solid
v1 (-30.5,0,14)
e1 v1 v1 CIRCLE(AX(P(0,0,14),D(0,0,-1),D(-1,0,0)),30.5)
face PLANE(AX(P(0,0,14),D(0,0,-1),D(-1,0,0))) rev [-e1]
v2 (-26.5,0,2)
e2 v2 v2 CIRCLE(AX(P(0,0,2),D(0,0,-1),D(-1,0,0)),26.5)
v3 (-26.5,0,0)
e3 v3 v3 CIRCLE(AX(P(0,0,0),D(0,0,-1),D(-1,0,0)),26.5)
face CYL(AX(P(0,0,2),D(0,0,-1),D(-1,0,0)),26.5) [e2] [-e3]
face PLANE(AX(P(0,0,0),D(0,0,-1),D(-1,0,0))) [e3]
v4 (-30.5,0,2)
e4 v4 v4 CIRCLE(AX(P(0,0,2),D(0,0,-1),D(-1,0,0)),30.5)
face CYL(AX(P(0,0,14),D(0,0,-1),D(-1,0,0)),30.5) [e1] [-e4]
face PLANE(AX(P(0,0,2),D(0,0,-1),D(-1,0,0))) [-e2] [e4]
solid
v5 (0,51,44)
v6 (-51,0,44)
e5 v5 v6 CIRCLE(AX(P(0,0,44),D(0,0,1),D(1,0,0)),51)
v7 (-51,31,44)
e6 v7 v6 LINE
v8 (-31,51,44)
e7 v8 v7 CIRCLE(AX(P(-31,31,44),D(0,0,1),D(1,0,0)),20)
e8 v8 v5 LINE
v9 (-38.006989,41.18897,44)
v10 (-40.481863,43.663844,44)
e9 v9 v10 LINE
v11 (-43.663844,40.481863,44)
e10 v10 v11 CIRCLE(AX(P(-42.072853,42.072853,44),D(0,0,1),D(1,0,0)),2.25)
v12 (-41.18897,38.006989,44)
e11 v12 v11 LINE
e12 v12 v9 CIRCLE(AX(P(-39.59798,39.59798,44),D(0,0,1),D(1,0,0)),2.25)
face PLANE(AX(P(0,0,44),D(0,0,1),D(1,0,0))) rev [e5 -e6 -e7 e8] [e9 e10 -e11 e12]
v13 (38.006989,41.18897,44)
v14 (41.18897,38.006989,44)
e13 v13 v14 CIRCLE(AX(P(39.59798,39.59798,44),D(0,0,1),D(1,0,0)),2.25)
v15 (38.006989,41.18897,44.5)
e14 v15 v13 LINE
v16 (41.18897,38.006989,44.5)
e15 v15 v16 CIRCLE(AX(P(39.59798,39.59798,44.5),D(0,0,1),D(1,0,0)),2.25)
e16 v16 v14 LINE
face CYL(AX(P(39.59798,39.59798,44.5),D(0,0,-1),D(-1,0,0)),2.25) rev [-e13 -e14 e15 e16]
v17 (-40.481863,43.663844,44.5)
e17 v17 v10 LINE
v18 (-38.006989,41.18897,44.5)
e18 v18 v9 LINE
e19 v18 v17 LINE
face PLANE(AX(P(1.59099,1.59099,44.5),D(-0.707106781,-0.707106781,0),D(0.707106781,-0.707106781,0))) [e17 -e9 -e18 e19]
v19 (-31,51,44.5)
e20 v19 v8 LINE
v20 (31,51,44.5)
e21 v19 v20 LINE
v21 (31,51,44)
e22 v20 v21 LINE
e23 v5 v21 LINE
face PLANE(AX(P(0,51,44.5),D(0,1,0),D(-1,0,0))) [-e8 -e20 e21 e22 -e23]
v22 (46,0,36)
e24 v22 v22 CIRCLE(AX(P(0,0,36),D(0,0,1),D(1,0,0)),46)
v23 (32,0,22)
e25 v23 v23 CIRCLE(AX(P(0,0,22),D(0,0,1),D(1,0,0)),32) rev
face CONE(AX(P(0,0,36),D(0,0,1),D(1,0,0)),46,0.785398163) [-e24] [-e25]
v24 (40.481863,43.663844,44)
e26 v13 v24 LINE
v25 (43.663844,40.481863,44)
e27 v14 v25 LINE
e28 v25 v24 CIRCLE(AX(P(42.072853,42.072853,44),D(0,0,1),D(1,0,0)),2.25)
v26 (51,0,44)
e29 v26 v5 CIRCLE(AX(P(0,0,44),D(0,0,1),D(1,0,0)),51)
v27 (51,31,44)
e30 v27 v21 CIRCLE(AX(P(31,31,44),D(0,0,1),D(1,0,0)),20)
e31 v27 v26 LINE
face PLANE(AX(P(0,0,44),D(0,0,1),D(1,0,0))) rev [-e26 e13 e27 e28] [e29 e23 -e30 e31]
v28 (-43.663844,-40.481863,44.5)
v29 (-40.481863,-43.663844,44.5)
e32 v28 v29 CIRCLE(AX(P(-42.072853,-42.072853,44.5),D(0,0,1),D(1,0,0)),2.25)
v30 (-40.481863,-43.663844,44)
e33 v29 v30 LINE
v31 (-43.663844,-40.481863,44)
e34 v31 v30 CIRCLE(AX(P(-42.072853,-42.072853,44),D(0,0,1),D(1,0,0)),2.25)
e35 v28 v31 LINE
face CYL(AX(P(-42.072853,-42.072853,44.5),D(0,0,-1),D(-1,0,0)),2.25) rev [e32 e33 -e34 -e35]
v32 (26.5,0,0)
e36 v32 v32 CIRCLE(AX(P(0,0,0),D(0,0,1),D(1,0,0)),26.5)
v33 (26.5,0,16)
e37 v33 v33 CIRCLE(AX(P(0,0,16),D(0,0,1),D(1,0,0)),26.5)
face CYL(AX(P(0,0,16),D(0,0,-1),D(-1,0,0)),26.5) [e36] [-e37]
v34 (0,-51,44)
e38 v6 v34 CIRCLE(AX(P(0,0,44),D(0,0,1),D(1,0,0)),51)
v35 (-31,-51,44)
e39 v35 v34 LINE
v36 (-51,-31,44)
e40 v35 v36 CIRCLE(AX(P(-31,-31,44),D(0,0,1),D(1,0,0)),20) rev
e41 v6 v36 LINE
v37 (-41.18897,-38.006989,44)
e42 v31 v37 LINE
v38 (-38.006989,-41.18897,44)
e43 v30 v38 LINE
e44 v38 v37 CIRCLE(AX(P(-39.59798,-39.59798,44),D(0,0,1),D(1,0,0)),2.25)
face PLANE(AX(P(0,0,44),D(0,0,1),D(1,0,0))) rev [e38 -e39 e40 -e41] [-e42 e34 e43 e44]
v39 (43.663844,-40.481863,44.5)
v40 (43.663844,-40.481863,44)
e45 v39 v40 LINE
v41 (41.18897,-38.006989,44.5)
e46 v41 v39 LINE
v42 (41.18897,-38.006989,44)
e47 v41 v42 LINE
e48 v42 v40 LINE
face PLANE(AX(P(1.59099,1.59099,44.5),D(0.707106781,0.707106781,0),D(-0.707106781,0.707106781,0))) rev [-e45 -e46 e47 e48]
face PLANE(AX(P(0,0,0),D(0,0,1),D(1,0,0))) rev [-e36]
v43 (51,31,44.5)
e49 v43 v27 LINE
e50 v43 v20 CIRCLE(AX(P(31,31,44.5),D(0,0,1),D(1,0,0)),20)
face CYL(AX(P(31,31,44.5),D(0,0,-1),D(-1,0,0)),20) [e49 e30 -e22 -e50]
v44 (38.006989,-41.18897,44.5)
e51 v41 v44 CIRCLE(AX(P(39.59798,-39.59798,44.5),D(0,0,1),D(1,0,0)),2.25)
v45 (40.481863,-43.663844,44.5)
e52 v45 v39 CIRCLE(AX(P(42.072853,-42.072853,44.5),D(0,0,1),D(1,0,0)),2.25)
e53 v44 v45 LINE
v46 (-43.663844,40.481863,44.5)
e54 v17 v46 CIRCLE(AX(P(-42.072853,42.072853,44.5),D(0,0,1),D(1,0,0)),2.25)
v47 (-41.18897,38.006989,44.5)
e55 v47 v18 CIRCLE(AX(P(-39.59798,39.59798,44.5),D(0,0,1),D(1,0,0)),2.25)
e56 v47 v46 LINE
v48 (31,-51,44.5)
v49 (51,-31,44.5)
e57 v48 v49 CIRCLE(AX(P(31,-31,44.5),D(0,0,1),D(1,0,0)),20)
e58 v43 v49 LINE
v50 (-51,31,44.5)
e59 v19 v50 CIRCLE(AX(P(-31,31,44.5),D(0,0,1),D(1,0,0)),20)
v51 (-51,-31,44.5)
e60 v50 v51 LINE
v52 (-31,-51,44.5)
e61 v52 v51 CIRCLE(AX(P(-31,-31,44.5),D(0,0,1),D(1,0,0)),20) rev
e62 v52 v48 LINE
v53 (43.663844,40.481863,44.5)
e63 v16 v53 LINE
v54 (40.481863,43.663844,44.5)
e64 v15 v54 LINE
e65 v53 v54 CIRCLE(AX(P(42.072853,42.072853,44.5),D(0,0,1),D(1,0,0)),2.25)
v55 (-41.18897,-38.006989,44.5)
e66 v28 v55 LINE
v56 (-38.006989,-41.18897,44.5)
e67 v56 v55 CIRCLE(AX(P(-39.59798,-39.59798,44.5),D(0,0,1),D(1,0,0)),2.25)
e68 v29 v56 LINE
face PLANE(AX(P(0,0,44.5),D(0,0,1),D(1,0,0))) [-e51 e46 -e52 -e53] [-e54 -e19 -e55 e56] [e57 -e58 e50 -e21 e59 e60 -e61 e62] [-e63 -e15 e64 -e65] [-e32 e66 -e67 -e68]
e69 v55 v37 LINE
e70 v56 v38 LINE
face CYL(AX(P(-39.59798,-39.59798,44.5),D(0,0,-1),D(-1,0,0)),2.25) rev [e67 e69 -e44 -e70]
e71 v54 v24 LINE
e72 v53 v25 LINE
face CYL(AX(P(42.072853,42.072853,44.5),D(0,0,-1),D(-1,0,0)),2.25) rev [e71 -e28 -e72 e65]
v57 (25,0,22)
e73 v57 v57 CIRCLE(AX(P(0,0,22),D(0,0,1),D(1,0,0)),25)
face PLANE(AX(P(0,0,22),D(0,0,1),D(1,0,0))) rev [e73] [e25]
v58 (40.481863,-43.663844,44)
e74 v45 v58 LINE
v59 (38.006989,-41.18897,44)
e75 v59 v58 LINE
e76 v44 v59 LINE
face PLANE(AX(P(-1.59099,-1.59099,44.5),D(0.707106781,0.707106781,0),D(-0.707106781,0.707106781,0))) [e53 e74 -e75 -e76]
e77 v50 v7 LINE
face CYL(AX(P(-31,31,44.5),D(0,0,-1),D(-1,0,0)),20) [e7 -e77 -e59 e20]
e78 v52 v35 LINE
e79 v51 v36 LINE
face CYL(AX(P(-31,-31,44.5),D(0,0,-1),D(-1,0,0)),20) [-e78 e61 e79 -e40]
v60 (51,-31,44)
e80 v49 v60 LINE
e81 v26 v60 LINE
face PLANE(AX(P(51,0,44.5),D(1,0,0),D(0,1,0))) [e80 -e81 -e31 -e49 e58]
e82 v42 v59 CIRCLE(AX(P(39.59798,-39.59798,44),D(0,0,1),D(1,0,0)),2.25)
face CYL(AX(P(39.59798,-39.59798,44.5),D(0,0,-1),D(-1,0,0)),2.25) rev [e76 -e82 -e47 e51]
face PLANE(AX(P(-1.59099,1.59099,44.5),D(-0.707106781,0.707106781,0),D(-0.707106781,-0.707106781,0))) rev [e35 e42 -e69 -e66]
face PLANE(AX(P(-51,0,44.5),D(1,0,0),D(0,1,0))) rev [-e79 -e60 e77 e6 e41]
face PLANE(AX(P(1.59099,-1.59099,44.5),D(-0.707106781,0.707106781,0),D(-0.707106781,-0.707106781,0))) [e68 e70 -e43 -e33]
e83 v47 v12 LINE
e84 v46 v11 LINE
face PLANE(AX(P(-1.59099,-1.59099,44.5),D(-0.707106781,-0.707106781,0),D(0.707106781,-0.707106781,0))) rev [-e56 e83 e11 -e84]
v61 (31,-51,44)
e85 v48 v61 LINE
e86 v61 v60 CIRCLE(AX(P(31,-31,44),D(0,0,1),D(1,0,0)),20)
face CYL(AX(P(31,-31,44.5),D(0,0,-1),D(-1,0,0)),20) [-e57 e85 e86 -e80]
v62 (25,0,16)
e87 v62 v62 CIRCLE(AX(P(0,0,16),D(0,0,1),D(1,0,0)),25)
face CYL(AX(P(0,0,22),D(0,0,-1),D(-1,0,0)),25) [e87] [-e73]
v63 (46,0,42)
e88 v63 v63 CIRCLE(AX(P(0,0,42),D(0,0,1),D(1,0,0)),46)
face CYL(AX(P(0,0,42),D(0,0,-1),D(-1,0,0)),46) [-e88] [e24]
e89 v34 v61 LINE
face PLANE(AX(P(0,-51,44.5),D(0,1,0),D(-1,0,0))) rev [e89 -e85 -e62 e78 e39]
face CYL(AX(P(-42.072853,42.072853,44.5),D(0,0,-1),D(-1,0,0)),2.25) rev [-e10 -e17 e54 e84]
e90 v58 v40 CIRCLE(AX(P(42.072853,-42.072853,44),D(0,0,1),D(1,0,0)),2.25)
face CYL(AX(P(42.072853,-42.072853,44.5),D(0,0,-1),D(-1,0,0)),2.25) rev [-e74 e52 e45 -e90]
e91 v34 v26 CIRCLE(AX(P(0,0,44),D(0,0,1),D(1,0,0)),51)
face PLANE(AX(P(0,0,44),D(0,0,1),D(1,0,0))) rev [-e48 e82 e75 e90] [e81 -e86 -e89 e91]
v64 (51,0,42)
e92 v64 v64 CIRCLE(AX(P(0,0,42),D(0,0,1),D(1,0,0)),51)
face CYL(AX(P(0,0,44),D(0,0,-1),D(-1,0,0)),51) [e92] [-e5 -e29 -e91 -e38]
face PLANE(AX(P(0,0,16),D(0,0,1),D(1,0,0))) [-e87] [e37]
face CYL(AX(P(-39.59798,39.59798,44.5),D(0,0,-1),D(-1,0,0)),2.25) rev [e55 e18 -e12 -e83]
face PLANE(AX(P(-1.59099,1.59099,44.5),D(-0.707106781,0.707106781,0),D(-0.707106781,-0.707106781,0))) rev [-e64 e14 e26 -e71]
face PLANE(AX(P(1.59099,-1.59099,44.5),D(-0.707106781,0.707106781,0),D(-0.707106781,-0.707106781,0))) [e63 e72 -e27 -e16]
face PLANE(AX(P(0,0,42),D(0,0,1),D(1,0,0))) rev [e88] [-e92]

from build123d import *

# Parameters (mm, degrees)
ESQUISSE1_R             = 26.5
BOSS_EXTRU_1_DEPTH      = 16
ESQUISSE4_R             = 25
BOSS_EXTRU_2_DEPTH      = 6
ESQUISSE5_R             = 46
BOSS_EXTRU_3_DEPTH      = 14
CHANFREIN1_SIZE         = 14
ESQUISSE6_R             = 46
BOSS_EXTRU_4_DEPTH      = 6
ESQUISSE7_R             = 51
BOSS_EXTRU_5_DEPTH      = 2
BOSS_EXTRU_6_DEPTH      = 0.5
ESQUISSE9_R             = 30.5
BOSS_EXTRU_7_DEPTH      = 14
ESQUISSE10_R            = 30.5
ESQUISSE10_R_2          = 26.5
ENL_V_MAT_EXTRU_1_DEPTH = 2


with BuildPart() as part:
    # Esquisse1 → Boss.-Extru.1 (new body)
    with BuildSketch(Plane.XY):
        Circle(ESQUISSE1_R)
    extrude(amount=BOSS_EXTRU_1_DEPTH)

    # Esquisse4 → Boss.-Extru.2 (add)
    with BuildSketch(Plane.XY.offset(16)):
        Circle(ESQUISSE4_R)
    extrude(amount=BOSS_EXTRU_2_DEPTH)

    # Esquisse5 → Boss.-Extru.3 (add)
    with BuildSketch(Plane.XY.offset(22)):
        Circle(ESQUISSE5_R)
    extrude(amount=BOSS_EXTRU_3_DEPTH)

    # Chanfrein1
    chanfrein1_edges = [part.edges().sort_by_distance(p)[0] for p in [
        (-46, 0, 22),
    ]]
    chamfer(chanfrein1_edges, length=CHANFREIN1_SIZE - 0.0001)  # a hair under: the kernel refuses the full size

    # Esquisse6 → Boss.-Extru.4 (add)
    with BuildSketch(Plane.XY.offset(36)):
        Circle(ESQUISSE6_R)
    extrude(amount=BOSS_EXTRU_4_DEPTH)

    # Esquisse7 → Boss.-Extru.5 (add)
    with BuildSketch(Plane.XY.offset(42)):
        Circle(ESQUISSE7_R)
    extrude(amount=BOSS_EXTRU_5_DEPTH)

    # Esquisse8 → Boss.-Extru.6 (add)
    with BuildSketch(Plane.XY.offset(44)):
        with BuildLine():
            ThreePointArc((-51, -31), (-49.47759065, -38.653668647), (-45.142135624, -45.142135624))
            Line((-45.142135624, -45.142135624), (-43.663843738, -43.663843738))
            ThreePointArc((-43.663843738, -43.663843738), (-44.322853481, -42.072853481), (-43.663843738, -40.481863223))
            Line((-43.663843738, -40.481863223), (-41.188970004, -38.006989489))
            ThreePointArc((-41.188970004, -38.006989489), (-39.597979746, -37.347979746), (-38.006989489, -38.006989489))
            Line((-38.006989489, -38.006989489), (-36.062445841, -36.062445841))
            ThreePointArc((-36.062445841, -36.062445841), (-47.117856123, -19.516855134), (-51, -1.81e-07))
            Line((-51, -1.81e-07), (-51, -31))
        make_face()
        with BuildLine():
            Line((-43.663843738, -43.663843738), (-45.142135624, -45.142135624))
            ThreePointArc((-45.142135624, -45.142135624), (-38.653668647, -49.47759065), (-31, -51))
            Line((-31, -51), (6e-08, -51))
            ThreePointArc((6e-08, -51), (-19.516855023, -47.11785617), (-36.062445841, -36.062445841))
            Line((-36.062445841, -36.062445841), (-38.006989489, -38.006989489))
            ThreePointArc((-38.006989489, -38.006989489), (-37.347979746, -39.597979746), (-38.006989489, -41.188970004))
            Line((-38.006989489, -41.188970004), (-40.481863223, -43.663843738))
            ThreePointArc((-40.481863223, -43.663843738), (-42.072853481, -44.322853481), (-43.663843738, -43.663843738))
        make_face()
        with BuildLine():
            ThreePointArc((-36.062445841, -36.062445841), (-19.516855023, -47.11785617), (6e-08, -51))
            ThreePointArc((6e-08, -51), (19.516855078, -47.117856147), (36.062445841, -36.062445841))
            Line((36.062445841, -36.062445841), (0, 0))
            Line((0, 0), (-36.062445841, -36.062445841))
        make_face()
        with BuildLine():
            ThreePointArc((-36.062445841, 36.062445841), (-47.117856193, 19.516854967), (-51, -1.81e-07))
            ThreePointArc((-51, -1.81e-07), (-47.117856123, -19.516855134), (-36.062445841, -36.062445841))
            Line((-36.062445841, -36.062445841), (0, 0))
            Line((0, 0), (-36.062445841, 36.062445841))
        make_face()
        with BuildLine():
            Line((0, 0), (36.062445841, -36.062445841))
            ThreePointArc((36.062445841, -36.062445841), (47.117856158, -19.516855051), (51, 0))
            ThreePointArc((51, 0), (47.117856158, 19.516855051), (36.062445841, 36.062445841))
            Line((36.062445841, 36.062445841), (0, 0))
        make_face()
        with BuildLine():
            ThreePointArc((1.95e-07, 51), (-19.516854961, 47.117856195), (-36.062445841, 36.062445841))
            Line((-36.062445841, 36.062445841), (0, 0))
            Line((0, 0), (36.062445841, 36.062445841))
            ThreePointArc((36.062445841, 36.062445841), (19.516855141, 47.117856121), (1.95e-07, 51))
        make_face()
        with BuildLine():
            ThreePointArc((36.062445841, -36.062445841), (19.516855078, -47.117856147), (6e-08, -51))
            Line((6e-08, -51), (31, -51))
            ThreePointArc((31, -51), (38.653668647, -49.47759065), (45.142135624, -45.142135624))
            Line((45.142135624, -45.142135624), (43.663843738, -43.663843738))
            ThreePointArc((43.663843738, -43.663843738), (42.072853481, -44.322853481), (40.481863223, -43.663843738))
            Line((40.481863223, -43.663843738), (38.006989489, -41.188970004))
            ThreePointArc((38.006989489, -41.188970004), (37.347979746, -39.597979746), (38.006989489, -38.006989489))
            Line((38.006989489, -38.006989489), (36.062445841, -36.062445841))
        make_face()
        with BuildLine():
            ThreePointArc((51, 0), (47.117856158, -19.516855051), (36.062445841, -36.062445841))
            Line((36.062445841, -36.062445841), (38.006989489, -38.006989489))
            ThreePointArc((38.006989489, -38.006989489), (39.597979746, -37.347979746), (41.188970004, -38.006989489))
            Line((41.188970004, -38.006989489), (43.663843738, -40.481863223))
            ThreePointArc((43.663843738, -40.481863223), (44.322853481, -42.072853481), (43.663843738, -43.663843738))
            Line((43.663843738, -43.663843738), (45.142135624, -45.142135624))
            ThreePointArc((45.142135624, -45.142135624), (49.47759065, -38.653668647), (51, -31))
            Line((51, -31), (51, 0))
        make_face()
        with BuildLine():
            ThreePointArc((36.062445841, 36.062445841), (47.117856158, 19.516855051), (51, 0))
            Line((51, 0), (51, 31))
            ThreePointArc((51, 31), (49.47759065, 38.653668647), (45.142135624, 45.142135624))
            Line((45.142135624, 45.142135624), (43.663843738, 43.663843738))
            ThreePointArc((43.663843738, 43.663843738), (44.322853481, 42.072853481), (43.663843738, 40.481863223))
            Line((43.663843738, 40.481863223), (41.188970004, 38.006989489))
            ThreePointArc((41.188970004, 38.006989489), (39.597979746, 37.347979746), (38.006989489, 38.006989489))
            Line((38.006989489, 38.006989489), (36.062445841, 36.062445841))
        make_face()
        with BuildLine():
            Line((31, 51), (1.95e-07, 51))
            ThreePointArc((1.95e-07, 51), (19.516855141, 47.117856121), (36.062445841, 36.062445841))
            Line((36.062445841, 36.062445841), (38.006989489, 38.006989489))
            ThreePointArc((38.006989489, 38.006989489), (37.347979746, 39.597979746), (38.006989489, 41.188970004))
            Line((38.006989489, 41.188970004), (40.481863223, 43.663843738))
            ThreePointArc((40.481863223, 43.663843738), (42.072853481, 44.322853481), (43.663843738, 43.663843738))
            Line((43.663843738, 43.663843738), (45.142135624, 45.142135624))
            ThreePointArc((45.142135624, 45.142135624), (38.653668647, 49.47759065), (31, 51))
        make_face()
        with BuildLine():
            Line((-38.006989489, 38.006989489), (-36.062445841, 36.062445841))
            ThreePointArc((-36.062445841, 36.062445841), (-19.516854961, 47.117856195), (1.95e-07, 51))
            Line((1.95e-07, 51), (-31, 51))
            ThreePointArc((-31, 51), (-38.653668647, 49.47759065), (-45.142135624, 45.142135624))
            Line((-45.142135624, 45.142135624), (-43.663843738, 43.663843738))
            ThreePointArc((-43.663843738, 43.663843738), (-42.072853481, 44.322853481), (-40.481863223, 43.663843738))
            Line((-40.481863223, 43.663843738), (-38.006989489, 41.188970004))
            ThreePointArc((-38.006989489, 41.188970004), (-37.347979746, 39.597979746), (-38.006989489, 38.006989489))
        make_face()
        with BuildLine():
            Line((-51, 31), (-51, -1.81e-07))
            ThreePointArc((-51, -1.81e-07), (-47.117856193, 19.516854967), (-36.062445841, 36.062445841))
            Line((-36.062445841, 36.062445841), (-38.006989489, 38.006989489))
            ThreePointArc((-38.006989489, 38.006989489), (-39.597979746, 37.347979746), (-41.188970004, 38.006989489))
            Line((-41.188970004, 38.006989489), (-43.663843738, 40.481863223))
            ThreePointArc((-43.663843738, 40.481863223), (-44.322853481, 42.072853481), (-43.663843738, 43.663843738))
            Line((-43.663843738, 43.663843738), (-45.142135624, 45.142135624))
            ThreePointArc((-45.142135624, 45.142135624), (-49.47759065, 38.653668647), (-51, 31))
        make_face()
    extrude(amount=BOSS_EXTRU_6_DEPTH)


with BuildPart() as body_2:
    # Esquisse9 → Boss.-Extru.7 (new body)
    with BuildSketch(Plane(origin=(0, 0, 0), x_dir=(-1, 0, 0), z_dir=(0, 0, -1))):
        Circle(ESQUISSE9_R)
    extrude(amount=-BOSS_EXTRU_7_DEPTH)

    # Esquisse10 → Enlèv. mat.-Extru.1 (cut)
    with BuildSketch(Plane(origin=(0, 0, 0), x_dir=(-1, 0, 0), z_dir=(0, 0, -1))):
        Circle(ESQUISSE10_R)
        Circle(ESQUISSE10_R_2, mode=Mode.SUBTRACT)
    extrude(amount=-ENL_V_MAT_EXTRU_1_DEPTH, mode=Mode.SUBTRACT)


solid = Compound([part.part, body_2.part])
